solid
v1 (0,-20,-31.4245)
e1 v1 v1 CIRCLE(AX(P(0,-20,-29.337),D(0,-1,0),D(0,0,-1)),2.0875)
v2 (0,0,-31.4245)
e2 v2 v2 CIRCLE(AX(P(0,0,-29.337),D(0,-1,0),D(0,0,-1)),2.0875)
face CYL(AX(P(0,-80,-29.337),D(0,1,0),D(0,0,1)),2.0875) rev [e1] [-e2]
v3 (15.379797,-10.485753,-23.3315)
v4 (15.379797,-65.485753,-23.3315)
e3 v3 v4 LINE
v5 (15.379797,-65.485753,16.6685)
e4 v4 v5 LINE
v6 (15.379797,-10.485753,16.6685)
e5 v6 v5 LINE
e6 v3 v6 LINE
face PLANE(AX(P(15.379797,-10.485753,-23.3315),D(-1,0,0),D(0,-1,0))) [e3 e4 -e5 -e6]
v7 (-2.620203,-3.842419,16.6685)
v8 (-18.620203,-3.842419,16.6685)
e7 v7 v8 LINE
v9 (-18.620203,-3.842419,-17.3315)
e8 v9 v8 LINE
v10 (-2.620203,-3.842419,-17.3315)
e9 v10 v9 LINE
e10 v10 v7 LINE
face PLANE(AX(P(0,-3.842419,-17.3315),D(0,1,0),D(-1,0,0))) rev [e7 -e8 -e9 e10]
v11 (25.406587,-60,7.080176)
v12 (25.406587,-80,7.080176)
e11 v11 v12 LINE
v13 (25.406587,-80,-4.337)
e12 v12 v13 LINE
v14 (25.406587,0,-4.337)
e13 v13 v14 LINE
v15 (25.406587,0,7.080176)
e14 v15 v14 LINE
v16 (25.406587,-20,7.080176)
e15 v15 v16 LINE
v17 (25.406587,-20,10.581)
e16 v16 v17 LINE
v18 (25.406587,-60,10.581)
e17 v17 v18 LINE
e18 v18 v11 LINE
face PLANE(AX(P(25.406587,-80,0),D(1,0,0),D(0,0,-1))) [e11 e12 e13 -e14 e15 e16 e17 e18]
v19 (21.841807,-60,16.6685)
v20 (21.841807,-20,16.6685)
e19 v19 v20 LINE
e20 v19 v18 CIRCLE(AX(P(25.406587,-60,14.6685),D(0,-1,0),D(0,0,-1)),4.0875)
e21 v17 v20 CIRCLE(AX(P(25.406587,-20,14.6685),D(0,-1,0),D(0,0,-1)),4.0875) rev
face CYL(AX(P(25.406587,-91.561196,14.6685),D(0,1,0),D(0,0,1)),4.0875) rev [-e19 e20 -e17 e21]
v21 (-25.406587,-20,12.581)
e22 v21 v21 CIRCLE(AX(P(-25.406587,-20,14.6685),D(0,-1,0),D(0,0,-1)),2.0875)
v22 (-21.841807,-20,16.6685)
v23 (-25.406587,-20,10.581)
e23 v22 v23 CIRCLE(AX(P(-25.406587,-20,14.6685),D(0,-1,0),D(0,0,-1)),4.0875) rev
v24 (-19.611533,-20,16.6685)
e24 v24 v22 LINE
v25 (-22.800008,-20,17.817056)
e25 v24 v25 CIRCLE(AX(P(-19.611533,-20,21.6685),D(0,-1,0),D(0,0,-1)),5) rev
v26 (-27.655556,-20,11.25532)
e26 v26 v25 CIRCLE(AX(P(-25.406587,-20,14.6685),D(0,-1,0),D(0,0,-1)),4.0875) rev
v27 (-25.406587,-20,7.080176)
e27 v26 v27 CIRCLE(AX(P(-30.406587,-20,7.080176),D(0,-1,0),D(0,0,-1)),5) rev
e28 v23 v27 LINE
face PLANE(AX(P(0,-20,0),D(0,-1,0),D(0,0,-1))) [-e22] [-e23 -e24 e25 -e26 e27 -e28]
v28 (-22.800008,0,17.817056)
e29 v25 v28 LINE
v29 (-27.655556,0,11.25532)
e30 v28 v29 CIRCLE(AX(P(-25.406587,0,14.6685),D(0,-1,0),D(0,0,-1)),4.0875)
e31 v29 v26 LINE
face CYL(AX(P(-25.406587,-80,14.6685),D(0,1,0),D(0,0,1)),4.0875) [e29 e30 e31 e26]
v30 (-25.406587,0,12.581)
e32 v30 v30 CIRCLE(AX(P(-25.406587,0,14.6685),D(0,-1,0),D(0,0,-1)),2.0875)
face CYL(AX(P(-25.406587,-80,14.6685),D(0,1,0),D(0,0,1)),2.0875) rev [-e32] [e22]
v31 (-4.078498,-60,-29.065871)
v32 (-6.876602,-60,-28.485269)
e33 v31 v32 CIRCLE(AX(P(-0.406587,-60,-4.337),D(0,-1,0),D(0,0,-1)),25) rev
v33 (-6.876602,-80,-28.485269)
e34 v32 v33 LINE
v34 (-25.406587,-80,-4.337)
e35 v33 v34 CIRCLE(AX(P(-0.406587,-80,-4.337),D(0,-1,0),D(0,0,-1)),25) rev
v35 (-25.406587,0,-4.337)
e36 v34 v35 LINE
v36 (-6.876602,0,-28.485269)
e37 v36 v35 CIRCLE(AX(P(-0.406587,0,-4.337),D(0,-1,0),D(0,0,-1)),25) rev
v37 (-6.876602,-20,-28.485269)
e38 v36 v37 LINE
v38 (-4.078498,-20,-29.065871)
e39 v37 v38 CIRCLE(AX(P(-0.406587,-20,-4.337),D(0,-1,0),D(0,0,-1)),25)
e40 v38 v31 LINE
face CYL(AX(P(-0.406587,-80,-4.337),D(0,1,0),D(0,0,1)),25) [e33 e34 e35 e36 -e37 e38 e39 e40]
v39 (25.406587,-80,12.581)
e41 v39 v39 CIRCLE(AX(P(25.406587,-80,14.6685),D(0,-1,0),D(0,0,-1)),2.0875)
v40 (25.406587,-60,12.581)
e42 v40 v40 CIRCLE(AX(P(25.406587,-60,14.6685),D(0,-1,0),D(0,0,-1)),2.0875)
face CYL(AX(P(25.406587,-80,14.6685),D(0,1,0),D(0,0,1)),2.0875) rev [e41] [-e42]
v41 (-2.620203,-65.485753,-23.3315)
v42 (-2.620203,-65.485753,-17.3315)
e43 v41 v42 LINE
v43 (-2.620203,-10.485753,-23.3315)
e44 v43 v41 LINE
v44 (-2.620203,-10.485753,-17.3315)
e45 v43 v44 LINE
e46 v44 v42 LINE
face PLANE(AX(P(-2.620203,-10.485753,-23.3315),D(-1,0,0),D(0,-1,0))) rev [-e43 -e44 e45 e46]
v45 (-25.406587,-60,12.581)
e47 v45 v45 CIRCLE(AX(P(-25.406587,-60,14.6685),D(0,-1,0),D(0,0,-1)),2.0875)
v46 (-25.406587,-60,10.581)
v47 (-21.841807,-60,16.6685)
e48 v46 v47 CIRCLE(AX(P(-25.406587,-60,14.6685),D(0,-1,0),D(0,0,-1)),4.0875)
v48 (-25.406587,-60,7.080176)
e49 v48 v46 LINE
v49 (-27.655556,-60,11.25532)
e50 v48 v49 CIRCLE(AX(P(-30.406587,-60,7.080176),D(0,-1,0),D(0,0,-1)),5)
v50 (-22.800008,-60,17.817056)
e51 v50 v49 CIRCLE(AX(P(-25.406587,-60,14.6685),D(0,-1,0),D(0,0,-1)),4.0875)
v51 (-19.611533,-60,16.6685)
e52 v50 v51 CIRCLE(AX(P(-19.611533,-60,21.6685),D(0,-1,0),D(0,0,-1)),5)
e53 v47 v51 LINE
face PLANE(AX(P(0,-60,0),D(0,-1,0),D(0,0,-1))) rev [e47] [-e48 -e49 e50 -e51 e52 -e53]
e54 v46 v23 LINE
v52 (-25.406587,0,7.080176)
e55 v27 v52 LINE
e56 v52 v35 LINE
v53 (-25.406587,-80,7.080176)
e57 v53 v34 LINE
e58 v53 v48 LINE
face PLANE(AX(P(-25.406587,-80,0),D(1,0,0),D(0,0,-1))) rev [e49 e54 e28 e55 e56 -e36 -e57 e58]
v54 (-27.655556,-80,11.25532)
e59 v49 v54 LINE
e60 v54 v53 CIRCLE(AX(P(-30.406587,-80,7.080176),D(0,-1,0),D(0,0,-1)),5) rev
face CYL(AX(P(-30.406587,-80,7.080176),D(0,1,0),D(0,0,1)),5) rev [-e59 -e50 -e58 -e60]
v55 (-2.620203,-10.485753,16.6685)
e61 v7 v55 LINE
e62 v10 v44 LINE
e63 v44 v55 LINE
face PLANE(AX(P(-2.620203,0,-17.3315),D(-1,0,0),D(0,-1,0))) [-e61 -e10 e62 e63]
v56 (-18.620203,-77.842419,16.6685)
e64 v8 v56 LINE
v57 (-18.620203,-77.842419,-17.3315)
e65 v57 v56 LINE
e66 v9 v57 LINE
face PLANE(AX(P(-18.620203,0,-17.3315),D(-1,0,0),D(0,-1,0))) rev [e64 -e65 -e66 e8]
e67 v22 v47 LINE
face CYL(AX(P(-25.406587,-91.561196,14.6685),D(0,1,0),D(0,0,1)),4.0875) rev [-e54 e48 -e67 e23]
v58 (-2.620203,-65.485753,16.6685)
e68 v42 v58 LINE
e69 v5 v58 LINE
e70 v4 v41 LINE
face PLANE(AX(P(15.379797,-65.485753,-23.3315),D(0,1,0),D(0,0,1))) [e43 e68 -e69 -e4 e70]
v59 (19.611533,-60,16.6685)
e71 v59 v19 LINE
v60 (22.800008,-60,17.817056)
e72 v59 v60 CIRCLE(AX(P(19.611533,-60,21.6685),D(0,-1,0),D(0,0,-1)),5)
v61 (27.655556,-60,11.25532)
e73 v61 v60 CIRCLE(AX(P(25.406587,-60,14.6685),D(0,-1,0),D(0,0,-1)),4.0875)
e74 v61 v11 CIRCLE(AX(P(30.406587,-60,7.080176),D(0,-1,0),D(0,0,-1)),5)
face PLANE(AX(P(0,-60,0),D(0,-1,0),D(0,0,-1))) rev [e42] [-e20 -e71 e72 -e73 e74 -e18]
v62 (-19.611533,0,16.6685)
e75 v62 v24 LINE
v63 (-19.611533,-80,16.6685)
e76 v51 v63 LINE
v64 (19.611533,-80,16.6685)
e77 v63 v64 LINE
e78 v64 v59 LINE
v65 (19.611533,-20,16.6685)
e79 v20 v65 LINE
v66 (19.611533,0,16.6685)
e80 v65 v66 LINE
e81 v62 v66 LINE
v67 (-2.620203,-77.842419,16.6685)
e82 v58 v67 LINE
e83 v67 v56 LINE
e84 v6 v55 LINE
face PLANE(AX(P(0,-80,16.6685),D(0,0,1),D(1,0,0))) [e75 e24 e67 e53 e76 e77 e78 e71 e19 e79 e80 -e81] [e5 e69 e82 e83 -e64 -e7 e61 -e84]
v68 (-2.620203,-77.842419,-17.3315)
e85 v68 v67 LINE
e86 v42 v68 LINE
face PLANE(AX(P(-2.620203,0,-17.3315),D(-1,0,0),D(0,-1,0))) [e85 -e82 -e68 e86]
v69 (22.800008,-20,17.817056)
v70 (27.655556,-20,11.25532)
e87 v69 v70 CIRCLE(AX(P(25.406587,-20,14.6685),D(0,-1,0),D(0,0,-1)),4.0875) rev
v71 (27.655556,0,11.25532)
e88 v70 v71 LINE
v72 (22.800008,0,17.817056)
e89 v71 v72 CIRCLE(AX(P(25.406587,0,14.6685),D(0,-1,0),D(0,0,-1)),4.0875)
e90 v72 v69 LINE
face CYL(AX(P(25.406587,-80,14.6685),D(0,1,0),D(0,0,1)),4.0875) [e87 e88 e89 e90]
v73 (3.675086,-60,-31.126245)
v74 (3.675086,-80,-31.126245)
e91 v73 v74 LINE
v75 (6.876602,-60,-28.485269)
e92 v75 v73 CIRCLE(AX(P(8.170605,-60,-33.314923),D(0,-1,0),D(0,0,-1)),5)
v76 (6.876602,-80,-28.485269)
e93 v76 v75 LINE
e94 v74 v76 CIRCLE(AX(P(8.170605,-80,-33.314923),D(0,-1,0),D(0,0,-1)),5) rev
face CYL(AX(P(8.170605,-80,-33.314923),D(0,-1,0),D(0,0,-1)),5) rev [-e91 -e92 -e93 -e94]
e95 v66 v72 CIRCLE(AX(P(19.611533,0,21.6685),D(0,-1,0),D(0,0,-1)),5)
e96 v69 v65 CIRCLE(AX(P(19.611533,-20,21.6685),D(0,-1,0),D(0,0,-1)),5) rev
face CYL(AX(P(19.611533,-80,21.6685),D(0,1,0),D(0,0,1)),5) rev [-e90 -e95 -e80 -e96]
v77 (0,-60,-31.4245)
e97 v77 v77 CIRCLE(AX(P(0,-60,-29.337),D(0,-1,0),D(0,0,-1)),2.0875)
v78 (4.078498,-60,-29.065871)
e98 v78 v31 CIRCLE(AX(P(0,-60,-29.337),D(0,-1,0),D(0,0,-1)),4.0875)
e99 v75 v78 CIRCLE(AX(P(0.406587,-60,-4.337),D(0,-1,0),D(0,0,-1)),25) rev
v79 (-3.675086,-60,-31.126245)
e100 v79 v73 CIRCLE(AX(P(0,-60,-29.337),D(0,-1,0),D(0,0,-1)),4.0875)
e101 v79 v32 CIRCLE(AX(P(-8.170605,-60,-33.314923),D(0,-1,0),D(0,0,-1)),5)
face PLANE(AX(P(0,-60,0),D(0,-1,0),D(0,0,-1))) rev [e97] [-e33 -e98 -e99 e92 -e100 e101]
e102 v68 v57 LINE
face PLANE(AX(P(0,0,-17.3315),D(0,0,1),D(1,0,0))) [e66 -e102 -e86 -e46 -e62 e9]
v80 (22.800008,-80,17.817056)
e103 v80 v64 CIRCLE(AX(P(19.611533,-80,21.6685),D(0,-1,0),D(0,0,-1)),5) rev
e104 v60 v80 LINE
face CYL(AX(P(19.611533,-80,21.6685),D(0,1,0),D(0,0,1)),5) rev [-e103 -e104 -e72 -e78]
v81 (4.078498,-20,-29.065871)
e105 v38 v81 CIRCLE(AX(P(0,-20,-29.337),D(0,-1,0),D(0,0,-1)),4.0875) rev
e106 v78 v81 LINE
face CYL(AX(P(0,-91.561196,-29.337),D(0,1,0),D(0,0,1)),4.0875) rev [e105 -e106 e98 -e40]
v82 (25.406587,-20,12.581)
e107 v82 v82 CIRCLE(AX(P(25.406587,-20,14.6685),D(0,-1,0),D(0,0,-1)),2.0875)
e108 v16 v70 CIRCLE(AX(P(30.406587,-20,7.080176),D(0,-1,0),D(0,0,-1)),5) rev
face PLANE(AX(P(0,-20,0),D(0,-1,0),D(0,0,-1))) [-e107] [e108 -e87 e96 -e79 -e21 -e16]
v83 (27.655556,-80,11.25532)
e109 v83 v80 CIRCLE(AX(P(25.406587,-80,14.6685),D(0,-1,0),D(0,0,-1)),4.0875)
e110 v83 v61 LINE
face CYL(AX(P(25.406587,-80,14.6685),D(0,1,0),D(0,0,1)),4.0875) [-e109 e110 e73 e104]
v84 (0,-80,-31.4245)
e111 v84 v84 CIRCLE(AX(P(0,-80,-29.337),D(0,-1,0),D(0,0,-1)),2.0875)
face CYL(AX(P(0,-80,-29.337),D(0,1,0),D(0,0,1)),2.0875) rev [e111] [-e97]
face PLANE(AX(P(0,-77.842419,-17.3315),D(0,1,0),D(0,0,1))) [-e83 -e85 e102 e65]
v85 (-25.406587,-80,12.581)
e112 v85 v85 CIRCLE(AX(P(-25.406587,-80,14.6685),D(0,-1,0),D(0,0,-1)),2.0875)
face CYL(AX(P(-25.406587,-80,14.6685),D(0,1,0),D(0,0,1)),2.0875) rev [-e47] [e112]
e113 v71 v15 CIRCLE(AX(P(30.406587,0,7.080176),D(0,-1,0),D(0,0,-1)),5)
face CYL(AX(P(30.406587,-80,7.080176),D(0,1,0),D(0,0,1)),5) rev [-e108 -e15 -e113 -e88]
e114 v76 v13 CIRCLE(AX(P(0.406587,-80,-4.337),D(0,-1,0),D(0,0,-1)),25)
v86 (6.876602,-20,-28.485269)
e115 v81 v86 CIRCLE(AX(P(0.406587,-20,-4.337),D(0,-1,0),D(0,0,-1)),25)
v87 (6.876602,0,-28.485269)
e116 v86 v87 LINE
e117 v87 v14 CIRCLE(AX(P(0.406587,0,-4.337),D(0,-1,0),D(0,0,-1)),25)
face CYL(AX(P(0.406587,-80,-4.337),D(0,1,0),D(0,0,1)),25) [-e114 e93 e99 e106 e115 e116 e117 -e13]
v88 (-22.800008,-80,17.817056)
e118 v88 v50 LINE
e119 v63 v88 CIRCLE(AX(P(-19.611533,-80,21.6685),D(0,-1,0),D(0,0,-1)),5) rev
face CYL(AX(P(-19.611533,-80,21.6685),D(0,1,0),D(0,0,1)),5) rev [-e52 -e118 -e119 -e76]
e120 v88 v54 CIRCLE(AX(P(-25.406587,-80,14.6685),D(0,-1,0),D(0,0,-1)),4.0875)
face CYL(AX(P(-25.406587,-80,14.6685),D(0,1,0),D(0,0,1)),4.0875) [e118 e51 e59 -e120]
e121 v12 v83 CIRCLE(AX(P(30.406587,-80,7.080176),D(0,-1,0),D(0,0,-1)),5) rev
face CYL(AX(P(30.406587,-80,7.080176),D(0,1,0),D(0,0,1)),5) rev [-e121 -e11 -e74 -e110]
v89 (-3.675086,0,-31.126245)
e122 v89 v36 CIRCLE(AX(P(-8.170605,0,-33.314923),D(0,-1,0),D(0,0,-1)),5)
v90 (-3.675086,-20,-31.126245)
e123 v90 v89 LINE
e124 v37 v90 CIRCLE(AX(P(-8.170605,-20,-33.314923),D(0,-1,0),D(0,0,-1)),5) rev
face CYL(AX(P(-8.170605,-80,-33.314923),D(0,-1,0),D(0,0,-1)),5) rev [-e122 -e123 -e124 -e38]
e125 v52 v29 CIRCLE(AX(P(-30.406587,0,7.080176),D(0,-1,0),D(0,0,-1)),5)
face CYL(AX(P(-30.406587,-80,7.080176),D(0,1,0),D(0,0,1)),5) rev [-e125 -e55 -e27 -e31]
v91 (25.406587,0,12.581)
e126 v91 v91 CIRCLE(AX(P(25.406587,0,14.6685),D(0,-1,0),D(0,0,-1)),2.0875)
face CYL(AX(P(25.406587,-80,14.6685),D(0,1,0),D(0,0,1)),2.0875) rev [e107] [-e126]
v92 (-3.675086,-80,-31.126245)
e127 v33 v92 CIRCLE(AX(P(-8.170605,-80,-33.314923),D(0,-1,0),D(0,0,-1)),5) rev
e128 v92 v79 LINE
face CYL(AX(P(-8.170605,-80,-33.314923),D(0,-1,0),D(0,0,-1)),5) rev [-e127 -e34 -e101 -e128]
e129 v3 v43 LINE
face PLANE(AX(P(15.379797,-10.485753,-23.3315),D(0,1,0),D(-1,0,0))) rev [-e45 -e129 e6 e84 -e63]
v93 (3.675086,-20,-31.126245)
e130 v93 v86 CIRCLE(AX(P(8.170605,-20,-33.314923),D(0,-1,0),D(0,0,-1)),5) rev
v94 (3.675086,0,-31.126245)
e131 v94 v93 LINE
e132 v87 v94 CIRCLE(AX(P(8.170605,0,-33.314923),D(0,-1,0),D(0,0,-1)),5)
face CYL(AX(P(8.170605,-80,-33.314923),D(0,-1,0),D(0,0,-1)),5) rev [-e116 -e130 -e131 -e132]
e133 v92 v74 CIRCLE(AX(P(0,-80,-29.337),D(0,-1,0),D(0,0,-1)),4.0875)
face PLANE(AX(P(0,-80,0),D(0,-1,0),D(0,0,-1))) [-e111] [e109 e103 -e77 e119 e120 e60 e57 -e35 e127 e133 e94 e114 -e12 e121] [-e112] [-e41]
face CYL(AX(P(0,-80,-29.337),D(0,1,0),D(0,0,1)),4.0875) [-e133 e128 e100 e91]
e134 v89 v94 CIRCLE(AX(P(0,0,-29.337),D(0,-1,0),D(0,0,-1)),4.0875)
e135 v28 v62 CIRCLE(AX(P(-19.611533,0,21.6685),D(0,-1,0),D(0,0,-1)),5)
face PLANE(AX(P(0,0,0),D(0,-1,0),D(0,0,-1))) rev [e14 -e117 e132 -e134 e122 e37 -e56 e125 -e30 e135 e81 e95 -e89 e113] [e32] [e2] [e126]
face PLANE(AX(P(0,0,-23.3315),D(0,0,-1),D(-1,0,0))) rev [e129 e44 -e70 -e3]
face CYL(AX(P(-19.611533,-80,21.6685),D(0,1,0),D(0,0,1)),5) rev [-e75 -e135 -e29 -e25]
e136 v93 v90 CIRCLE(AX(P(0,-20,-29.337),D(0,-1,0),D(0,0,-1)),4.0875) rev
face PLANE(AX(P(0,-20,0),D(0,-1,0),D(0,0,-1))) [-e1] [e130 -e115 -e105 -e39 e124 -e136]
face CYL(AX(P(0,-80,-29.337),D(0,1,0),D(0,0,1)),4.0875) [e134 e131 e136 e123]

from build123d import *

# Parameters (mm, degrees)
SKETCH1_R               = 38.1
BULKHEAD_BODY_DEPTH     = 12.7
SKETCH2_R               = 1.5875
CUT_EXTRUDE1_DEPTH      = 12.7
BOSS_EXTRUDE1_OUTLINE_R = 2.0875
BOSS_EXTRUDE1_DEPTH     = 80
CUT_EXTRUDE4_DEPTH      = 20
CUT_EXTRUDE4_DEPTH_BACK = 20
SKETCH5_R               = 4.0875
FILLET1_START           = -80
FILLET1_DEPTH           = 20
FILLET1_START_2         = -20
FILLET1_2_DEPTH         = 20
CUT_EXTRUDE5_DEPTH      = 34
SKETCH4_5_W             = 18
SKETCH4_5_H             = 55
CUT_EXTRUDE6_DEPTH      = 40


with BuildPart() as part:
    # Sketch1 → Bulkhead Body (new body)
    with BuildSketch(Plane(origin=(0, 0, 0), x_dir=(1, 0, 0), z_dir=(0, 1, 0))):
        with Locations(Location((0, 0, 0), (0, 0, 270))):
            Circle(SKETCH1_R)
    extrude(amount=BULKHEAD_BODY_DEPTH)

    # Sketch2 → Cut-Extrude1 (cut)
    with BuildSketch(Plane(origin=(0, 12.7, 0), x_dir=(1, 0, 0), z_dir=(0, 1, 0))):
        with Locations(Location((0, 29.337, 0), (0, 0, 270))):
            Circle(SKETCH2_R)
        with Locations(Location((25.406587271, -14.5685, 0), (0, 0, 270))):
            Circle(SKETCH2_R)
        with Locations(Location((-25.31998473, -14.6185, 0), (0, 0, 270))):
            Circle(SKETCH2_R)
    extrude(amount=-CUT_EXTRUDE1_DEPTH, mode=Mode.SUBTRACT)


with BuildPart() as body_2:
    # Boss-Extrude1: read off the stored shape, not the designer's step
    # Boss-Extrude1 outline → Boss-Extrude1 (new body)
    with BuildSketch(Plane(origin=(0, 0, 0), x_dir=(-1, 0, 0), z_dir=(0, -1, 0))):
        with BuildLine():
            ThreePointArc((-4.078497939, 29.065871225), (-19.338013085, 20.664924444), (-25.406587271, 4.337))
            Line((-25.406587271, 4.337), (-25.406587271, -10.581))
            ThreePointArc((-25.406587271, -10.581), (-28.933813961, -16.734009168), (-21.841807299, -16.6685))
            Line((-21.841807299, -16.6685), (21.841807299, -16.6685))
            ThreePointArc((21.841807299, -16.6685), (28.933813961, -16.734009168), (25.406587271, -10.581))
            Line((25.406587271, -10.581), (25.406587271, 4.337))
            ThreePointArc((25.406587271, 4.337), (19.338013085, 20.664924444), (4.078497939, 29.065871225))
            ThreePointArc((4.078497939, 29.065871225), (0, 33.4245), (-4.078497939, 29.065871225))
        make_face()
        with Locations((-25.406587271, -14.6685)):
            Circle(BOSS_EXTRUDE1_OUTLINE_R, mode=Mode.SUBTRACT)
        with Locations((25.406587271, -14.6685)):
            Circle(BOSS_EXTRUDE1_OUTLINE_R, mode=Mode.SUBTRACT)
        with Locations((0, 29.337)):
            Circle(BOSS_EXTRUDE1_OUTLINE_R, mode=Mode.SUBTRACT)
    extrude(amount=BOSS_EXTRUDE1_DEPTH)

    # Sketch5 → Cut-Extrude4 (cut, two sides: drawn at the far end of the back side and taken through both)
    with BuildSketch(Plane(origin=(0, -40, 0), x_dir=(-1, 0, 0), z_dir=(0, -1, 0)).offset(-CUT_EXTRUDE4_DEPTH_BACK)):
        with Locations((25.406587271, -14.6685)):
            Circle(SKETCH5_R)
        with Locations((-25.406587271, -14.6685)):
            Circle(SKETCH5_R)
        with Locations((0, 29.337)):
            Circle(SKETCH5_R)
    extrude(amount=CUT_EXTRUDE4_DEPTH + CUT_EXTRUDE4_DEPTH_BACK, mode=Mode.SUBTRACT)

    # Fillet1: read off the stored shape, not the designer's step
    # Fillet1 outline → Fillet1 (add)
    with BuildSketch(Plane(origin=(0, 0, 0), x_dir=(1, 0, 0), z_dir=(0, 1, 0)).offset(FILLET1_START)):
        with BuildLine():
            ThreePointArc((-4.078497939, 29.065871225), (-4.011334199, 30.122400658), (-3.67508636, 31.126244671))
            ThreePointArc((-3.67508636, 31.126244671), (-4.988887184, 29.457894165), (-6.876601915, 28.485269307))
            ThreePointArc((-6.876601915, 28.485269307), (-5.485852661, 28.815583764), (-4.078497939, 29.065871225))
        make_face()
        with BuildLine():
            ThreePointArc((6.876601915, 28.485269307), (4.988887184, 29.457894165), (3.67508636, 31.126244671))
            ThreePointArc((3.67508636, 31.126244671), (4.011334199, 30.122400658), (4.078497939, 29.065871225))
            ThreePointArc((4.078497939, 29.065871225), (5.485852661, 28.815583764), (6.876601915, 28.485269307))
        make_face()
        with BuildLine():
            Line((-25.406587271, -10.581), (-25.406587271, -7.080176321))
            ThreePointArc((-25.406587271, -7.080176321), (-26.0045901, -9.451340784), (-27.655555634, -11.255320024))
            ThreePointArc((-27.655555634, -11.255320024), (-26.580530007, -10.753207584), (-25.406587271, -10.581))
        make_face()
        with BuildLine():
            ThreePointArc((27.655555634, -11.255320024), (26.0045901, -9.451340784), (25.406587271, -7.080176321))
            Line((25.406587271, -7.080176321), (25.406587271, -10.581))
            ThreePointArc((25.406587271, -10.581), (26.580530007, -10.753207584), (27.655555634, -11.255320024))
        make_face()
        with BuildLine():
            ThreePointArc((-21.841807299, -16.6685), (-22.267923157, -17.286981206), (-22.80000844, -17.817055708))
            ThreePointArc((-22.80000844, -17.817055708), (-21.306050221, -16.964394269), (-19.611532806, -16.6685))
            Line((-19.611532806, -16.6685), (-21.841807299, -16.6685))
        make_face()
        with BuildLine():
            ThreePointArc((19.611532806, -16.6685), (21.306050221, -16.964394269), (22.80000844, -17.817055708))
            ThreePointArc((22.80000844, -17.817055708), (22.267923157, -17.286981206), (21.841807299, -16.6685))
            Line((21.841807299, -16.6685), (19.611532806, -16.6685))
        make_face()
    extrude(amount=FILLET1_DEPTH)

    # Fillet1 2 outline → Fillet1 2 (add)
    with BuildSketch(Plane(origin=(0, 0, 0), x_dir=(1, 0, 0), z_dir=(0, 1, 0)).offset(FILLET1_START_2)):
        with BuildLine():
            ThreePointArc((-4.078497939, 29.065871225), (-4.011334199, 30.122400658), (-3.67508636, 31.126244671))
            ThreePointArc((-3.67508636, 31.126244671), (-4.988887184, 29.457894165), (-6.876601915, 28.485269307))
            ThreePointArc((-6.876601915, 28.485269307), (-5.485852661, 28.815583764), (-4.078497939, 29.065871225))
        make_face()
        with BuildLine():
            ThreePointArc((6.876601915, 28.485269307), (4.988887184, 29.457894165), (3.67508636, 31.126244671))
            ThreePointArc((3.67508636, 31.126244671), (4.011334199, 30.122400658), (4.078497939, 29.065871225))
            ThreePointArc((4.078497939, 29.065871225), (5.485852661, 28.815583764), (6.876601915, 28.485269307))
        make_face()
        with BuildLine():
            Line((-25.406587271, -10.581), (-25.406587271, -7.080176321))
            ThreePointArc((-25.406587271, -7.080176321), (-26.0045901, -9.451340784), (-27.655555634, -11.255320024))
            ThreePointArc((-27.655555634, -11.255320024), (-26.580530007, -10.753207584), (-25.406587271, -10.581))
        make_face()
        with BuildLine():
            ThreePointArc((27.655555634, -11.255320024), (26.0045901, -9.451340784), (25.406587271, -7.080176321))
            Line((25.406587271, -7.080176321), (25.406587271, -10.581))
            ThreePointArc((25.406587271, -10.581), (26.580530007, -10.753207584), (27.655555634, -11.255320024))
        make_face()
        with BuildLine():
            ThreePointArc((-21.841807299, -16.6685), (-22.267923157, -17.286981206), (-22.80000844, -17.817055708))
            ThreePointArc((-22.80000844, -17.817055708), (-21.306050221, -16.964394269), (-19.611532806, -16.6685))
            Line((-19.611532806, -16.6685), (-21.841807299, -16.6685))
        make_face()
        with BuildLine():
            ThreePointArc((19.611532806, -16.6685), (21.306050221, -16.964394269), (22.80000844, -17.817055708))
            ThreePointArc((22.80000844, -17.817055708), (22.267923157, -17.286981206), (21.841807299, -16.6685))
            Line((21.841807299, -16.6685), (19.611532806, -16.6685))
        make_face()
    extrude(amount=FILLET1_2_DEPTH)

    # Sketch4 → Cut-Extrude5 (cut)
    with BuildSketch(Plane.XY.offset(16.6685)):
        Polygon((-2.620203368, -65.485753458), (-2.620203368, -10.485753458), (-2.620203368, -3.842418919), (-18.620203368, -3.842418919), (-18.620203368, -77.842418919), (-2.620203368, -77.842418919), align=None)
    extrude(amount=-CUT_EXTRUDE5_DEPTH, mode=Mode.SUBTRACT)

    # Sketch4<5> → Cut-Extrude6 (cut)
    with BuildSketch(Plane.XY.offset(16.6685)):
        with Locations((6.379796632, -37.985753458)):
            Rectangle(SKETCH4_5_W, SKETCH4_5_H)
    extrude(amount=-CUT_EXTRUDE6_DEPTH, mode=Mode.SUBTRACT)


solid = body_2.part
